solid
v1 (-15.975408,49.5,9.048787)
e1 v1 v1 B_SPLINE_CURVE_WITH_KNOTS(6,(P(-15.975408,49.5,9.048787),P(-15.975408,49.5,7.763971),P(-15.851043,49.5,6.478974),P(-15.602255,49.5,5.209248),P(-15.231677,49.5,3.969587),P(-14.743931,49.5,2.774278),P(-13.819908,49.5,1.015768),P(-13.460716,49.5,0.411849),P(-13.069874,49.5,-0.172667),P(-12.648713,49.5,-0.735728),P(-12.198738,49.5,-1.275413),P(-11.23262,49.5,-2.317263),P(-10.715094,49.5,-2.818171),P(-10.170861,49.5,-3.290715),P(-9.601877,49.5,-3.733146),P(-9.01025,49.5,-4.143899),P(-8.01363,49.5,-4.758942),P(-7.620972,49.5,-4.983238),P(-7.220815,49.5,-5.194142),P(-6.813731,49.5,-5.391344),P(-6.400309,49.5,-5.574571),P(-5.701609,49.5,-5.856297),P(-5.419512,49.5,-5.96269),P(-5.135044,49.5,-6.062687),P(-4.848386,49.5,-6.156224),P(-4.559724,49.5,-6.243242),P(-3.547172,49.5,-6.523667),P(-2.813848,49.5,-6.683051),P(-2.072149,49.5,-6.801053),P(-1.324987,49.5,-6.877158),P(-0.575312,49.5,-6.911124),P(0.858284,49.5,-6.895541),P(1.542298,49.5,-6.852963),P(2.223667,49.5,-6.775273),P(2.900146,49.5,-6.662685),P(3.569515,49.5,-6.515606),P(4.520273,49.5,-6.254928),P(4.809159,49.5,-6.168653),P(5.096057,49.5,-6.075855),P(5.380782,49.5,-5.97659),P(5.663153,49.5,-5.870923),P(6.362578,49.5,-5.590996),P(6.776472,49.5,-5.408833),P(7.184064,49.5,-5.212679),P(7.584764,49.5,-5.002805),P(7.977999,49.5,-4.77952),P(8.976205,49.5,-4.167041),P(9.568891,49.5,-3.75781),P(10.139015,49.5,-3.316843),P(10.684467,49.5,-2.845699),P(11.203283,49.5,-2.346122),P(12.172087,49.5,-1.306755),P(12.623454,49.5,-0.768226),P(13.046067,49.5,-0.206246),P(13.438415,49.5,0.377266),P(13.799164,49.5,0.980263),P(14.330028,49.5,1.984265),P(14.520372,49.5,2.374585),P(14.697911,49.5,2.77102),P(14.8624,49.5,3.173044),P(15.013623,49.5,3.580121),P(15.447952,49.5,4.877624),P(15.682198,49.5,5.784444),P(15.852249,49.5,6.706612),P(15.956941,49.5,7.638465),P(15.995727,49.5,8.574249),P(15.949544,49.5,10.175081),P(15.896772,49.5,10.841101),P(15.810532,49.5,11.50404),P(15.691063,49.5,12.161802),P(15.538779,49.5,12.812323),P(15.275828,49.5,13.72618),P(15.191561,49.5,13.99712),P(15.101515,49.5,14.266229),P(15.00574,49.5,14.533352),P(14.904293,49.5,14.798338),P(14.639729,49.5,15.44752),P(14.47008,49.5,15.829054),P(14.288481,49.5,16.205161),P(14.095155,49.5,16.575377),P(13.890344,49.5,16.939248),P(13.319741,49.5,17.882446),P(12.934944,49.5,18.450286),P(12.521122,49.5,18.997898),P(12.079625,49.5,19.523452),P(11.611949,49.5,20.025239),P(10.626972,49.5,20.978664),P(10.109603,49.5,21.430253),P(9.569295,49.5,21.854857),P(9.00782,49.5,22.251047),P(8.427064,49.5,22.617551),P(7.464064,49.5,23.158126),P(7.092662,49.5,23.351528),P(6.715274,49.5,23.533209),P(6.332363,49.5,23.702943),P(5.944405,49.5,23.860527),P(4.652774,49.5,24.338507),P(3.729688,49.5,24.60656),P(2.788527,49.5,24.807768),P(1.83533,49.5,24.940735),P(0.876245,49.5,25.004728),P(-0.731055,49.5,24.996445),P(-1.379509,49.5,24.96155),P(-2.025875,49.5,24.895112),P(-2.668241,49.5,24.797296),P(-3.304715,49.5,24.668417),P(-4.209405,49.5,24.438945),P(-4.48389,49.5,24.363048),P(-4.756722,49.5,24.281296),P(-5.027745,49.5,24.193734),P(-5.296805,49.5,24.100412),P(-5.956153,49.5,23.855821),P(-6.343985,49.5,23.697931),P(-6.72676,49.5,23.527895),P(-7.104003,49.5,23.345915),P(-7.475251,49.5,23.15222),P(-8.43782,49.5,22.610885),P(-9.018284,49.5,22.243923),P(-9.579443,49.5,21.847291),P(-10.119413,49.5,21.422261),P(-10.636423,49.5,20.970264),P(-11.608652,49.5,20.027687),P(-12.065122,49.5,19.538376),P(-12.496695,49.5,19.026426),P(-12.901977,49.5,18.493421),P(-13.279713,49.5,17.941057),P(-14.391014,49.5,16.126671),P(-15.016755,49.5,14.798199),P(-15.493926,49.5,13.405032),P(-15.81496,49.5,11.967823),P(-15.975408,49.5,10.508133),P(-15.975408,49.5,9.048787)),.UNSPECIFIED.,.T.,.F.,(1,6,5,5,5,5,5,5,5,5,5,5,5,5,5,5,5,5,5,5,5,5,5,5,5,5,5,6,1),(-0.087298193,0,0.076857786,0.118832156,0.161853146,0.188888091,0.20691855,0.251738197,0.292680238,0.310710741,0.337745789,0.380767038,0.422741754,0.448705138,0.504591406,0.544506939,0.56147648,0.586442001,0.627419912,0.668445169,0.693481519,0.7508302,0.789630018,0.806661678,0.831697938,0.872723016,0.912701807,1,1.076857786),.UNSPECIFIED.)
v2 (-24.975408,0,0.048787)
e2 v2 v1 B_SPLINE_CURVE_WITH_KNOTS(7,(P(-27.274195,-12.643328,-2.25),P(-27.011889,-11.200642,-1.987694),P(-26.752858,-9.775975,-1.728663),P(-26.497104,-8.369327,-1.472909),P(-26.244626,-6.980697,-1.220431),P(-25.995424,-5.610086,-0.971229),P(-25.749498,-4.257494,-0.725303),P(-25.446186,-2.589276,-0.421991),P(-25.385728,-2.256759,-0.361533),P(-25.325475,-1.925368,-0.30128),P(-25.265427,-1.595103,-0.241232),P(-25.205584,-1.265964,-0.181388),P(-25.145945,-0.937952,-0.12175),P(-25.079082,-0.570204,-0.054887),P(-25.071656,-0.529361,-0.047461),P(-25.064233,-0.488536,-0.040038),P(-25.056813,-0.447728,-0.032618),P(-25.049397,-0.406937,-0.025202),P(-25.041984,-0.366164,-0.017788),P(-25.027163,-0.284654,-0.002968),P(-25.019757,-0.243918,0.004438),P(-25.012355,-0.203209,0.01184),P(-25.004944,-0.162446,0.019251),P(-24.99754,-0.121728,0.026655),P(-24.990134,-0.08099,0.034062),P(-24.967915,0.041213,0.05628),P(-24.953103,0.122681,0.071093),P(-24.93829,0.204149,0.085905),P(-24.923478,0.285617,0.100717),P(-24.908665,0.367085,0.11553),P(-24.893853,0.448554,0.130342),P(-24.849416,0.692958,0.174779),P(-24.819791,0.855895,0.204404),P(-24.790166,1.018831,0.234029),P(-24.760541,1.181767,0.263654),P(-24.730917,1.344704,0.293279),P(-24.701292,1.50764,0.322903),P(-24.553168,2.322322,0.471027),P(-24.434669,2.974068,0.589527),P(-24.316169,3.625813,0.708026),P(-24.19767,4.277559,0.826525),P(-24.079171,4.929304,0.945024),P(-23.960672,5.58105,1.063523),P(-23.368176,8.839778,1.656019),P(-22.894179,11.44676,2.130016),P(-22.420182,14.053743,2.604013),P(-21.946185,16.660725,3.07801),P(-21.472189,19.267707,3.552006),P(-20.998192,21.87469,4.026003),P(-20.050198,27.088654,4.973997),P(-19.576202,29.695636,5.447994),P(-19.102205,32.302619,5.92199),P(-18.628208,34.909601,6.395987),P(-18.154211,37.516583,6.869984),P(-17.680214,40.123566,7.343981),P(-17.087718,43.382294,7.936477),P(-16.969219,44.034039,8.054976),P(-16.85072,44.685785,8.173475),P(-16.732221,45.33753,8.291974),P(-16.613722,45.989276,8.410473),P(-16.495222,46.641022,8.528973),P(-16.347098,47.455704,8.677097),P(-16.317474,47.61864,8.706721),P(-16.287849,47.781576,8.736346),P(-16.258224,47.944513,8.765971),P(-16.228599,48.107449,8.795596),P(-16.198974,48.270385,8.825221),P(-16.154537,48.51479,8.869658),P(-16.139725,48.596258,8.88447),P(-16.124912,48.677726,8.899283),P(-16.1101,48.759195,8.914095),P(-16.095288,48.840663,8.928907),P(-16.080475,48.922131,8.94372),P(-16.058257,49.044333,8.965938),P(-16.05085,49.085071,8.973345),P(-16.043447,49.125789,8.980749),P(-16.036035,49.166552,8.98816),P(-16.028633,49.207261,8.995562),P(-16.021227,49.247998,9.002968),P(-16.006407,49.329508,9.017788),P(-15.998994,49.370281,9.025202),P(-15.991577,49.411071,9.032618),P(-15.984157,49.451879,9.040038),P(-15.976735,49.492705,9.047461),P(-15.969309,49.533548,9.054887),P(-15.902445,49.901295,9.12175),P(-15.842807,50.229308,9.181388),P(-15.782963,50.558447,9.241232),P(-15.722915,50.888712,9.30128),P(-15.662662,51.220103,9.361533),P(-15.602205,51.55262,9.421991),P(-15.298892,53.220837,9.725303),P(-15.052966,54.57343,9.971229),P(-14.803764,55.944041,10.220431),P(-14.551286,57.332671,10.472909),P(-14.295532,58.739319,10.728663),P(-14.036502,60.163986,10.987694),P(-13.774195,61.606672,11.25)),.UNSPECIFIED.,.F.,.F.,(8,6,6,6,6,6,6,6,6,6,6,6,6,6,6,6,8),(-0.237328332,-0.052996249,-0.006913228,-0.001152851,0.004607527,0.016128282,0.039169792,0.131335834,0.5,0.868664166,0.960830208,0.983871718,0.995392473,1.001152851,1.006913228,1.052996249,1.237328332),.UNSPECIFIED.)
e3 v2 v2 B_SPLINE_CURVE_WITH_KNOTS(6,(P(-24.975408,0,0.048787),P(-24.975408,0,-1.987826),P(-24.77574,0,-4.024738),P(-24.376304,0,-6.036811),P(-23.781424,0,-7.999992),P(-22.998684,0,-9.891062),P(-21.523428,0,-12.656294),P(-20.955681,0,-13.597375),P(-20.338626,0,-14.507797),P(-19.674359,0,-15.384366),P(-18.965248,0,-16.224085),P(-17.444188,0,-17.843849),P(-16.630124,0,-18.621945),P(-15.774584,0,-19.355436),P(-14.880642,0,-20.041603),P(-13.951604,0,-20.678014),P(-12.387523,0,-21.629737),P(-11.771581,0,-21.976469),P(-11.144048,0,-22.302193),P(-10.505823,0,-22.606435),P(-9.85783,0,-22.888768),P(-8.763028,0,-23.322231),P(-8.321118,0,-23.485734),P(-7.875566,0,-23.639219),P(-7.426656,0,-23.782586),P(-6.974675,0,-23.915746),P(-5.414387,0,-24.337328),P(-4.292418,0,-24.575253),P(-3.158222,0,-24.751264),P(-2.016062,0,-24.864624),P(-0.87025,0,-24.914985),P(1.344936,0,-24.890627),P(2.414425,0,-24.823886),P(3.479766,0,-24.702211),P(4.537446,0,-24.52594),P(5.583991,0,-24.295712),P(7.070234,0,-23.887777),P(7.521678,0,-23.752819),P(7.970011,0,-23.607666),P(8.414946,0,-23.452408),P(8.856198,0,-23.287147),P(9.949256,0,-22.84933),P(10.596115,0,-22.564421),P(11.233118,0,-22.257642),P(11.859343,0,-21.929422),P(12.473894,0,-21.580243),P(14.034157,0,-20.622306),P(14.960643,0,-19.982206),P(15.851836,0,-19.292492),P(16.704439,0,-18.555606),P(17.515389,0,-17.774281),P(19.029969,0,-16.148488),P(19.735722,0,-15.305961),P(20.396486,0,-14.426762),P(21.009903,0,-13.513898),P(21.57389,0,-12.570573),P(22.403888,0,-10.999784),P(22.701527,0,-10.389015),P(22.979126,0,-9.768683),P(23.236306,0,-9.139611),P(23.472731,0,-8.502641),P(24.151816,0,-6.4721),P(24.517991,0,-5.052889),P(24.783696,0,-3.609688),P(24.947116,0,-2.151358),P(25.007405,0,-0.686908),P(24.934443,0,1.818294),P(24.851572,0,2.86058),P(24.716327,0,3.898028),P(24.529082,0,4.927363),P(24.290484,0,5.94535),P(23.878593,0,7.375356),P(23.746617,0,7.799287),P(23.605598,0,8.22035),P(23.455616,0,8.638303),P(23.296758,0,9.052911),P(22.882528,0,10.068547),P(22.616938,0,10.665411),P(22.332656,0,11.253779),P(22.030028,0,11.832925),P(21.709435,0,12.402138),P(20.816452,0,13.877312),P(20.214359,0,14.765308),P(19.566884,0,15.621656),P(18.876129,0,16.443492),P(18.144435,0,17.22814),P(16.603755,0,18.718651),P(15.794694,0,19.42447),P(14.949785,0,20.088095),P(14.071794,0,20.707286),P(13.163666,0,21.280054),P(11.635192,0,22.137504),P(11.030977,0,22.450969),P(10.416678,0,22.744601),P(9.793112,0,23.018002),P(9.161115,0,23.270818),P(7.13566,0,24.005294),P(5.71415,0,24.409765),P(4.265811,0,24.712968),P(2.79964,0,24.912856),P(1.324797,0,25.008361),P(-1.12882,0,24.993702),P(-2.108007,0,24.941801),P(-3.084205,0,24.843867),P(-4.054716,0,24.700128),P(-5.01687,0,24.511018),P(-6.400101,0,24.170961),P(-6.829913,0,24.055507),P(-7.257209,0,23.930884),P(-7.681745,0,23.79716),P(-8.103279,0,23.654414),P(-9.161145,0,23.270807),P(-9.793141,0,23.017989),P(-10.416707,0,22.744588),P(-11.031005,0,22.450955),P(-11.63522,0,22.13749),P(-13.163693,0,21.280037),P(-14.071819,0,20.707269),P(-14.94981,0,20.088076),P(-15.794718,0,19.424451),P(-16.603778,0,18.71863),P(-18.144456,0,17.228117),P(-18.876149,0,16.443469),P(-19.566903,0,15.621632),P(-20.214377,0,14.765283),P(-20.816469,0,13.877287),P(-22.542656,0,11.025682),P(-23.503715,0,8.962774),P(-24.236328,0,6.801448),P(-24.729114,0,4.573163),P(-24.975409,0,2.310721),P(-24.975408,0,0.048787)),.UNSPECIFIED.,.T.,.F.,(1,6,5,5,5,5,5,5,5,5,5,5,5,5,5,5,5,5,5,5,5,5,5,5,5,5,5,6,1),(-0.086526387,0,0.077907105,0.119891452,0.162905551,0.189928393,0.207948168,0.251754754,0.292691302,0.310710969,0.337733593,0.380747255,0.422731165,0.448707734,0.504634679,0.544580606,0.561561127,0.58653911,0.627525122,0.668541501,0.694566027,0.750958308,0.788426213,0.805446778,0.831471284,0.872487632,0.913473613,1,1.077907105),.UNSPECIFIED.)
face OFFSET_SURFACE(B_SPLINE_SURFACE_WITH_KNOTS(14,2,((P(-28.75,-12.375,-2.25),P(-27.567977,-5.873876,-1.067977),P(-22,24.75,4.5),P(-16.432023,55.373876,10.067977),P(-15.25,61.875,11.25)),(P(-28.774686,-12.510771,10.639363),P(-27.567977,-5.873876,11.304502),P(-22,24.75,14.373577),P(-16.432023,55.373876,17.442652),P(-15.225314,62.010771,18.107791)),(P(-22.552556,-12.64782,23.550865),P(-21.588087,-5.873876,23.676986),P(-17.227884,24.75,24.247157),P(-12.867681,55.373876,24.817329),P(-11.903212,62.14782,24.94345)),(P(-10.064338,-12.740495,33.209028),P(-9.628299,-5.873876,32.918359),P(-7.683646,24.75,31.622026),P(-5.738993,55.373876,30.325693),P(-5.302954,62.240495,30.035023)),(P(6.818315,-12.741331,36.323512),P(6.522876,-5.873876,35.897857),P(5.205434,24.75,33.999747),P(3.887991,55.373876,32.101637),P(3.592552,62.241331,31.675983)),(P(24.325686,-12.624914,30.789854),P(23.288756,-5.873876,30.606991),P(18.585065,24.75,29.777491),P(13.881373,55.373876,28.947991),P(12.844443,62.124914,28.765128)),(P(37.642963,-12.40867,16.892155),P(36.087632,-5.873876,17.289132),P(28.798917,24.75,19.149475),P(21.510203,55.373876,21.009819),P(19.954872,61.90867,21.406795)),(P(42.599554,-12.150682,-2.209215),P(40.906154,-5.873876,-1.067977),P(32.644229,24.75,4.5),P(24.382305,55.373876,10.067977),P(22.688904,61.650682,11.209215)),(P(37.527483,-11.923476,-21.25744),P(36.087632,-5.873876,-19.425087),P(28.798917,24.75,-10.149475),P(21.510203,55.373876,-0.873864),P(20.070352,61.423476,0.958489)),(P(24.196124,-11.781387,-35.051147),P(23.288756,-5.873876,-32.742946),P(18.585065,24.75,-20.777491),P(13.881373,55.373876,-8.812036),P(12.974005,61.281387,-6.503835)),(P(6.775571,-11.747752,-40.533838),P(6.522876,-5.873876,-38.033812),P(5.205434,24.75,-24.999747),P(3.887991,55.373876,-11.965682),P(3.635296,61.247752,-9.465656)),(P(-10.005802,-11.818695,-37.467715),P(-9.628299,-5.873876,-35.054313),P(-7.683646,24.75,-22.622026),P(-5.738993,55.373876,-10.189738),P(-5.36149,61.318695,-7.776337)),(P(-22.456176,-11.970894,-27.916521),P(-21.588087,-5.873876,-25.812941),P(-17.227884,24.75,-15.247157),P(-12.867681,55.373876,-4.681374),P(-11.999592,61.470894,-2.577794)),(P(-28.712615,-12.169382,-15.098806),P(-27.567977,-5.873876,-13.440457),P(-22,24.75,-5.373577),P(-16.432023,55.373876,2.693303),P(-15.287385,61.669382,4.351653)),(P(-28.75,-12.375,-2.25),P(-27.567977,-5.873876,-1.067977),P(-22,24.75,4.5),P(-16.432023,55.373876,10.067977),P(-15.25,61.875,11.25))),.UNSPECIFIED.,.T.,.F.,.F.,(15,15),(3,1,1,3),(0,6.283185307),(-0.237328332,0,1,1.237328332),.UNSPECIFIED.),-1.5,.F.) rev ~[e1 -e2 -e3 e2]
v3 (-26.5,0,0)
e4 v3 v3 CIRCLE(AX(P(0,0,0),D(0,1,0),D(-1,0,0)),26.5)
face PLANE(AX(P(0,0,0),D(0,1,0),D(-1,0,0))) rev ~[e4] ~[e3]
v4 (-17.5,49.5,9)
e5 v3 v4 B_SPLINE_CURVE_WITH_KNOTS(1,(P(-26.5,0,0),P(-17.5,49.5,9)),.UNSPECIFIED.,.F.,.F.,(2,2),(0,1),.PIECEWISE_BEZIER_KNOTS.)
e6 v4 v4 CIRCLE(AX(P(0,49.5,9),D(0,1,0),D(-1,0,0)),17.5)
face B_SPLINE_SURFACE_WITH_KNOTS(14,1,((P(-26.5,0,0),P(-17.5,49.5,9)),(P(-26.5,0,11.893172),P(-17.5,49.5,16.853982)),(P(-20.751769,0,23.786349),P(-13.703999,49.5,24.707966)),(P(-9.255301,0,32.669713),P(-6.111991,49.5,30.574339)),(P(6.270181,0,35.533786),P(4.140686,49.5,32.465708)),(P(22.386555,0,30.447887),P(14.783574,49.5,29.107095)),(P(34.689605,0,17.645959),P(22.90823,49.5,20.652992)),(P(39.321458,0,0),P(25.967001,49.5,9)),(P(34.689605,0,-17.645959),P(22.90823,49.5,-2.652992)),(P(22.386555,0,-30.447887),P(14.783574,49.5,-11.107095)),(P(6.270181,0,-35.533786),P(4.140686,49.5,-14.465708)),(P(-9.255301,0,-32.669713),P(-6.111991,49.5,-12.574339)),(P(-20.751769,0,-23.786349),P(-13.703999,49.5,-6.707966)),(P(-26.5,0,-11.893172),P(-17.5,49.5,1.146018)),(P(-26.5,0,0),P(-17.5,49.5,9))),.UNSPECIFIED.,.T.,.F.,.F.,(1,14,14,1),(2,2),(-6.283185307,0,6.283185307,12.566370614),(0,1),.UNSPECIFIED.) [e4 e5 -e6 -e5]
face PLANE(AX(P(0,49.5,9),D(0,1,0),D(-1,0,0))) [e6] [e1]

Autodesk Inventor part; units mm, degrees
ref_plane "YZ Plane" through (0, 0, 0) normal (1, 0, 0) x (0, 1, 0)
ref_plane "XY Plane" through (0, 0, 0) normal (0, 0, 1) x (1, 0, 0)
sketch "Szkic6" plane through (0, 0, 0) normal (0, 1, 0) x (-1, 0, 0)
  circle A0 centre (0, 0) radius 26.5
  dimension "d33" = 53
ref_plane "Płaszczyzna konstrukcyjna1" through (0, 49.5, 0) normal (0, 1, 0) x (-1, 0, 0)
sketch "Szkic7" plane through (0, 49.5, 0) normal (0, 1, 0) x (-1, 0, 0)
  circle A0 centre (0, 9) radius 17.5
  line L0 (0, -20.3) -> (0, 20.3) construction
  circle A1 centre (0, 0) radius 26.5 construction
  dimension "d35" = 35
loft "Wyciągnięcie złożone1" add profiles "Szkic6", "Szkic7"
shell "Skorupa1" thickness 1.5 removed faces 2 at (-4.3663, 49.5, 7.9238) at (-1.8199, 0, -2.5499)
equation "\"d33\" = OD1"
equation "\"d35\" = OD2"
equation "\"d52\" = THK"
equation "\"SzerokośćGięciaPodcięcia\" = Grubość"
equation "\"RozmiarPodcięciaNarożnika\" = 4 * Grubość"
equation "\"PromieńPrzejścia\" = PromieńGięcia"
equation "\"Rozmiar_promienia_Jacobiego\" = PromieńGięcia"
equation "\"Wielk_odstępu\" = Grubość"
equation "\"d2\" = PromieńGięcia"
equation "\"d23\" = PromieńGięcia"
equation "\"OD1\" = 53"
equation "\"OD2\" = 35"
equation "\"L\" = 49.5"
equation "\"THK\" = 1.5"
equation "\"d34\" = L"
equation "\"Grubość\" = 1.5"
equation "\"PromieńGięcia\" = 3"
properties part number "Redukcja asymetryczna Ø53x35x1,5 L=49,5" material "304"
